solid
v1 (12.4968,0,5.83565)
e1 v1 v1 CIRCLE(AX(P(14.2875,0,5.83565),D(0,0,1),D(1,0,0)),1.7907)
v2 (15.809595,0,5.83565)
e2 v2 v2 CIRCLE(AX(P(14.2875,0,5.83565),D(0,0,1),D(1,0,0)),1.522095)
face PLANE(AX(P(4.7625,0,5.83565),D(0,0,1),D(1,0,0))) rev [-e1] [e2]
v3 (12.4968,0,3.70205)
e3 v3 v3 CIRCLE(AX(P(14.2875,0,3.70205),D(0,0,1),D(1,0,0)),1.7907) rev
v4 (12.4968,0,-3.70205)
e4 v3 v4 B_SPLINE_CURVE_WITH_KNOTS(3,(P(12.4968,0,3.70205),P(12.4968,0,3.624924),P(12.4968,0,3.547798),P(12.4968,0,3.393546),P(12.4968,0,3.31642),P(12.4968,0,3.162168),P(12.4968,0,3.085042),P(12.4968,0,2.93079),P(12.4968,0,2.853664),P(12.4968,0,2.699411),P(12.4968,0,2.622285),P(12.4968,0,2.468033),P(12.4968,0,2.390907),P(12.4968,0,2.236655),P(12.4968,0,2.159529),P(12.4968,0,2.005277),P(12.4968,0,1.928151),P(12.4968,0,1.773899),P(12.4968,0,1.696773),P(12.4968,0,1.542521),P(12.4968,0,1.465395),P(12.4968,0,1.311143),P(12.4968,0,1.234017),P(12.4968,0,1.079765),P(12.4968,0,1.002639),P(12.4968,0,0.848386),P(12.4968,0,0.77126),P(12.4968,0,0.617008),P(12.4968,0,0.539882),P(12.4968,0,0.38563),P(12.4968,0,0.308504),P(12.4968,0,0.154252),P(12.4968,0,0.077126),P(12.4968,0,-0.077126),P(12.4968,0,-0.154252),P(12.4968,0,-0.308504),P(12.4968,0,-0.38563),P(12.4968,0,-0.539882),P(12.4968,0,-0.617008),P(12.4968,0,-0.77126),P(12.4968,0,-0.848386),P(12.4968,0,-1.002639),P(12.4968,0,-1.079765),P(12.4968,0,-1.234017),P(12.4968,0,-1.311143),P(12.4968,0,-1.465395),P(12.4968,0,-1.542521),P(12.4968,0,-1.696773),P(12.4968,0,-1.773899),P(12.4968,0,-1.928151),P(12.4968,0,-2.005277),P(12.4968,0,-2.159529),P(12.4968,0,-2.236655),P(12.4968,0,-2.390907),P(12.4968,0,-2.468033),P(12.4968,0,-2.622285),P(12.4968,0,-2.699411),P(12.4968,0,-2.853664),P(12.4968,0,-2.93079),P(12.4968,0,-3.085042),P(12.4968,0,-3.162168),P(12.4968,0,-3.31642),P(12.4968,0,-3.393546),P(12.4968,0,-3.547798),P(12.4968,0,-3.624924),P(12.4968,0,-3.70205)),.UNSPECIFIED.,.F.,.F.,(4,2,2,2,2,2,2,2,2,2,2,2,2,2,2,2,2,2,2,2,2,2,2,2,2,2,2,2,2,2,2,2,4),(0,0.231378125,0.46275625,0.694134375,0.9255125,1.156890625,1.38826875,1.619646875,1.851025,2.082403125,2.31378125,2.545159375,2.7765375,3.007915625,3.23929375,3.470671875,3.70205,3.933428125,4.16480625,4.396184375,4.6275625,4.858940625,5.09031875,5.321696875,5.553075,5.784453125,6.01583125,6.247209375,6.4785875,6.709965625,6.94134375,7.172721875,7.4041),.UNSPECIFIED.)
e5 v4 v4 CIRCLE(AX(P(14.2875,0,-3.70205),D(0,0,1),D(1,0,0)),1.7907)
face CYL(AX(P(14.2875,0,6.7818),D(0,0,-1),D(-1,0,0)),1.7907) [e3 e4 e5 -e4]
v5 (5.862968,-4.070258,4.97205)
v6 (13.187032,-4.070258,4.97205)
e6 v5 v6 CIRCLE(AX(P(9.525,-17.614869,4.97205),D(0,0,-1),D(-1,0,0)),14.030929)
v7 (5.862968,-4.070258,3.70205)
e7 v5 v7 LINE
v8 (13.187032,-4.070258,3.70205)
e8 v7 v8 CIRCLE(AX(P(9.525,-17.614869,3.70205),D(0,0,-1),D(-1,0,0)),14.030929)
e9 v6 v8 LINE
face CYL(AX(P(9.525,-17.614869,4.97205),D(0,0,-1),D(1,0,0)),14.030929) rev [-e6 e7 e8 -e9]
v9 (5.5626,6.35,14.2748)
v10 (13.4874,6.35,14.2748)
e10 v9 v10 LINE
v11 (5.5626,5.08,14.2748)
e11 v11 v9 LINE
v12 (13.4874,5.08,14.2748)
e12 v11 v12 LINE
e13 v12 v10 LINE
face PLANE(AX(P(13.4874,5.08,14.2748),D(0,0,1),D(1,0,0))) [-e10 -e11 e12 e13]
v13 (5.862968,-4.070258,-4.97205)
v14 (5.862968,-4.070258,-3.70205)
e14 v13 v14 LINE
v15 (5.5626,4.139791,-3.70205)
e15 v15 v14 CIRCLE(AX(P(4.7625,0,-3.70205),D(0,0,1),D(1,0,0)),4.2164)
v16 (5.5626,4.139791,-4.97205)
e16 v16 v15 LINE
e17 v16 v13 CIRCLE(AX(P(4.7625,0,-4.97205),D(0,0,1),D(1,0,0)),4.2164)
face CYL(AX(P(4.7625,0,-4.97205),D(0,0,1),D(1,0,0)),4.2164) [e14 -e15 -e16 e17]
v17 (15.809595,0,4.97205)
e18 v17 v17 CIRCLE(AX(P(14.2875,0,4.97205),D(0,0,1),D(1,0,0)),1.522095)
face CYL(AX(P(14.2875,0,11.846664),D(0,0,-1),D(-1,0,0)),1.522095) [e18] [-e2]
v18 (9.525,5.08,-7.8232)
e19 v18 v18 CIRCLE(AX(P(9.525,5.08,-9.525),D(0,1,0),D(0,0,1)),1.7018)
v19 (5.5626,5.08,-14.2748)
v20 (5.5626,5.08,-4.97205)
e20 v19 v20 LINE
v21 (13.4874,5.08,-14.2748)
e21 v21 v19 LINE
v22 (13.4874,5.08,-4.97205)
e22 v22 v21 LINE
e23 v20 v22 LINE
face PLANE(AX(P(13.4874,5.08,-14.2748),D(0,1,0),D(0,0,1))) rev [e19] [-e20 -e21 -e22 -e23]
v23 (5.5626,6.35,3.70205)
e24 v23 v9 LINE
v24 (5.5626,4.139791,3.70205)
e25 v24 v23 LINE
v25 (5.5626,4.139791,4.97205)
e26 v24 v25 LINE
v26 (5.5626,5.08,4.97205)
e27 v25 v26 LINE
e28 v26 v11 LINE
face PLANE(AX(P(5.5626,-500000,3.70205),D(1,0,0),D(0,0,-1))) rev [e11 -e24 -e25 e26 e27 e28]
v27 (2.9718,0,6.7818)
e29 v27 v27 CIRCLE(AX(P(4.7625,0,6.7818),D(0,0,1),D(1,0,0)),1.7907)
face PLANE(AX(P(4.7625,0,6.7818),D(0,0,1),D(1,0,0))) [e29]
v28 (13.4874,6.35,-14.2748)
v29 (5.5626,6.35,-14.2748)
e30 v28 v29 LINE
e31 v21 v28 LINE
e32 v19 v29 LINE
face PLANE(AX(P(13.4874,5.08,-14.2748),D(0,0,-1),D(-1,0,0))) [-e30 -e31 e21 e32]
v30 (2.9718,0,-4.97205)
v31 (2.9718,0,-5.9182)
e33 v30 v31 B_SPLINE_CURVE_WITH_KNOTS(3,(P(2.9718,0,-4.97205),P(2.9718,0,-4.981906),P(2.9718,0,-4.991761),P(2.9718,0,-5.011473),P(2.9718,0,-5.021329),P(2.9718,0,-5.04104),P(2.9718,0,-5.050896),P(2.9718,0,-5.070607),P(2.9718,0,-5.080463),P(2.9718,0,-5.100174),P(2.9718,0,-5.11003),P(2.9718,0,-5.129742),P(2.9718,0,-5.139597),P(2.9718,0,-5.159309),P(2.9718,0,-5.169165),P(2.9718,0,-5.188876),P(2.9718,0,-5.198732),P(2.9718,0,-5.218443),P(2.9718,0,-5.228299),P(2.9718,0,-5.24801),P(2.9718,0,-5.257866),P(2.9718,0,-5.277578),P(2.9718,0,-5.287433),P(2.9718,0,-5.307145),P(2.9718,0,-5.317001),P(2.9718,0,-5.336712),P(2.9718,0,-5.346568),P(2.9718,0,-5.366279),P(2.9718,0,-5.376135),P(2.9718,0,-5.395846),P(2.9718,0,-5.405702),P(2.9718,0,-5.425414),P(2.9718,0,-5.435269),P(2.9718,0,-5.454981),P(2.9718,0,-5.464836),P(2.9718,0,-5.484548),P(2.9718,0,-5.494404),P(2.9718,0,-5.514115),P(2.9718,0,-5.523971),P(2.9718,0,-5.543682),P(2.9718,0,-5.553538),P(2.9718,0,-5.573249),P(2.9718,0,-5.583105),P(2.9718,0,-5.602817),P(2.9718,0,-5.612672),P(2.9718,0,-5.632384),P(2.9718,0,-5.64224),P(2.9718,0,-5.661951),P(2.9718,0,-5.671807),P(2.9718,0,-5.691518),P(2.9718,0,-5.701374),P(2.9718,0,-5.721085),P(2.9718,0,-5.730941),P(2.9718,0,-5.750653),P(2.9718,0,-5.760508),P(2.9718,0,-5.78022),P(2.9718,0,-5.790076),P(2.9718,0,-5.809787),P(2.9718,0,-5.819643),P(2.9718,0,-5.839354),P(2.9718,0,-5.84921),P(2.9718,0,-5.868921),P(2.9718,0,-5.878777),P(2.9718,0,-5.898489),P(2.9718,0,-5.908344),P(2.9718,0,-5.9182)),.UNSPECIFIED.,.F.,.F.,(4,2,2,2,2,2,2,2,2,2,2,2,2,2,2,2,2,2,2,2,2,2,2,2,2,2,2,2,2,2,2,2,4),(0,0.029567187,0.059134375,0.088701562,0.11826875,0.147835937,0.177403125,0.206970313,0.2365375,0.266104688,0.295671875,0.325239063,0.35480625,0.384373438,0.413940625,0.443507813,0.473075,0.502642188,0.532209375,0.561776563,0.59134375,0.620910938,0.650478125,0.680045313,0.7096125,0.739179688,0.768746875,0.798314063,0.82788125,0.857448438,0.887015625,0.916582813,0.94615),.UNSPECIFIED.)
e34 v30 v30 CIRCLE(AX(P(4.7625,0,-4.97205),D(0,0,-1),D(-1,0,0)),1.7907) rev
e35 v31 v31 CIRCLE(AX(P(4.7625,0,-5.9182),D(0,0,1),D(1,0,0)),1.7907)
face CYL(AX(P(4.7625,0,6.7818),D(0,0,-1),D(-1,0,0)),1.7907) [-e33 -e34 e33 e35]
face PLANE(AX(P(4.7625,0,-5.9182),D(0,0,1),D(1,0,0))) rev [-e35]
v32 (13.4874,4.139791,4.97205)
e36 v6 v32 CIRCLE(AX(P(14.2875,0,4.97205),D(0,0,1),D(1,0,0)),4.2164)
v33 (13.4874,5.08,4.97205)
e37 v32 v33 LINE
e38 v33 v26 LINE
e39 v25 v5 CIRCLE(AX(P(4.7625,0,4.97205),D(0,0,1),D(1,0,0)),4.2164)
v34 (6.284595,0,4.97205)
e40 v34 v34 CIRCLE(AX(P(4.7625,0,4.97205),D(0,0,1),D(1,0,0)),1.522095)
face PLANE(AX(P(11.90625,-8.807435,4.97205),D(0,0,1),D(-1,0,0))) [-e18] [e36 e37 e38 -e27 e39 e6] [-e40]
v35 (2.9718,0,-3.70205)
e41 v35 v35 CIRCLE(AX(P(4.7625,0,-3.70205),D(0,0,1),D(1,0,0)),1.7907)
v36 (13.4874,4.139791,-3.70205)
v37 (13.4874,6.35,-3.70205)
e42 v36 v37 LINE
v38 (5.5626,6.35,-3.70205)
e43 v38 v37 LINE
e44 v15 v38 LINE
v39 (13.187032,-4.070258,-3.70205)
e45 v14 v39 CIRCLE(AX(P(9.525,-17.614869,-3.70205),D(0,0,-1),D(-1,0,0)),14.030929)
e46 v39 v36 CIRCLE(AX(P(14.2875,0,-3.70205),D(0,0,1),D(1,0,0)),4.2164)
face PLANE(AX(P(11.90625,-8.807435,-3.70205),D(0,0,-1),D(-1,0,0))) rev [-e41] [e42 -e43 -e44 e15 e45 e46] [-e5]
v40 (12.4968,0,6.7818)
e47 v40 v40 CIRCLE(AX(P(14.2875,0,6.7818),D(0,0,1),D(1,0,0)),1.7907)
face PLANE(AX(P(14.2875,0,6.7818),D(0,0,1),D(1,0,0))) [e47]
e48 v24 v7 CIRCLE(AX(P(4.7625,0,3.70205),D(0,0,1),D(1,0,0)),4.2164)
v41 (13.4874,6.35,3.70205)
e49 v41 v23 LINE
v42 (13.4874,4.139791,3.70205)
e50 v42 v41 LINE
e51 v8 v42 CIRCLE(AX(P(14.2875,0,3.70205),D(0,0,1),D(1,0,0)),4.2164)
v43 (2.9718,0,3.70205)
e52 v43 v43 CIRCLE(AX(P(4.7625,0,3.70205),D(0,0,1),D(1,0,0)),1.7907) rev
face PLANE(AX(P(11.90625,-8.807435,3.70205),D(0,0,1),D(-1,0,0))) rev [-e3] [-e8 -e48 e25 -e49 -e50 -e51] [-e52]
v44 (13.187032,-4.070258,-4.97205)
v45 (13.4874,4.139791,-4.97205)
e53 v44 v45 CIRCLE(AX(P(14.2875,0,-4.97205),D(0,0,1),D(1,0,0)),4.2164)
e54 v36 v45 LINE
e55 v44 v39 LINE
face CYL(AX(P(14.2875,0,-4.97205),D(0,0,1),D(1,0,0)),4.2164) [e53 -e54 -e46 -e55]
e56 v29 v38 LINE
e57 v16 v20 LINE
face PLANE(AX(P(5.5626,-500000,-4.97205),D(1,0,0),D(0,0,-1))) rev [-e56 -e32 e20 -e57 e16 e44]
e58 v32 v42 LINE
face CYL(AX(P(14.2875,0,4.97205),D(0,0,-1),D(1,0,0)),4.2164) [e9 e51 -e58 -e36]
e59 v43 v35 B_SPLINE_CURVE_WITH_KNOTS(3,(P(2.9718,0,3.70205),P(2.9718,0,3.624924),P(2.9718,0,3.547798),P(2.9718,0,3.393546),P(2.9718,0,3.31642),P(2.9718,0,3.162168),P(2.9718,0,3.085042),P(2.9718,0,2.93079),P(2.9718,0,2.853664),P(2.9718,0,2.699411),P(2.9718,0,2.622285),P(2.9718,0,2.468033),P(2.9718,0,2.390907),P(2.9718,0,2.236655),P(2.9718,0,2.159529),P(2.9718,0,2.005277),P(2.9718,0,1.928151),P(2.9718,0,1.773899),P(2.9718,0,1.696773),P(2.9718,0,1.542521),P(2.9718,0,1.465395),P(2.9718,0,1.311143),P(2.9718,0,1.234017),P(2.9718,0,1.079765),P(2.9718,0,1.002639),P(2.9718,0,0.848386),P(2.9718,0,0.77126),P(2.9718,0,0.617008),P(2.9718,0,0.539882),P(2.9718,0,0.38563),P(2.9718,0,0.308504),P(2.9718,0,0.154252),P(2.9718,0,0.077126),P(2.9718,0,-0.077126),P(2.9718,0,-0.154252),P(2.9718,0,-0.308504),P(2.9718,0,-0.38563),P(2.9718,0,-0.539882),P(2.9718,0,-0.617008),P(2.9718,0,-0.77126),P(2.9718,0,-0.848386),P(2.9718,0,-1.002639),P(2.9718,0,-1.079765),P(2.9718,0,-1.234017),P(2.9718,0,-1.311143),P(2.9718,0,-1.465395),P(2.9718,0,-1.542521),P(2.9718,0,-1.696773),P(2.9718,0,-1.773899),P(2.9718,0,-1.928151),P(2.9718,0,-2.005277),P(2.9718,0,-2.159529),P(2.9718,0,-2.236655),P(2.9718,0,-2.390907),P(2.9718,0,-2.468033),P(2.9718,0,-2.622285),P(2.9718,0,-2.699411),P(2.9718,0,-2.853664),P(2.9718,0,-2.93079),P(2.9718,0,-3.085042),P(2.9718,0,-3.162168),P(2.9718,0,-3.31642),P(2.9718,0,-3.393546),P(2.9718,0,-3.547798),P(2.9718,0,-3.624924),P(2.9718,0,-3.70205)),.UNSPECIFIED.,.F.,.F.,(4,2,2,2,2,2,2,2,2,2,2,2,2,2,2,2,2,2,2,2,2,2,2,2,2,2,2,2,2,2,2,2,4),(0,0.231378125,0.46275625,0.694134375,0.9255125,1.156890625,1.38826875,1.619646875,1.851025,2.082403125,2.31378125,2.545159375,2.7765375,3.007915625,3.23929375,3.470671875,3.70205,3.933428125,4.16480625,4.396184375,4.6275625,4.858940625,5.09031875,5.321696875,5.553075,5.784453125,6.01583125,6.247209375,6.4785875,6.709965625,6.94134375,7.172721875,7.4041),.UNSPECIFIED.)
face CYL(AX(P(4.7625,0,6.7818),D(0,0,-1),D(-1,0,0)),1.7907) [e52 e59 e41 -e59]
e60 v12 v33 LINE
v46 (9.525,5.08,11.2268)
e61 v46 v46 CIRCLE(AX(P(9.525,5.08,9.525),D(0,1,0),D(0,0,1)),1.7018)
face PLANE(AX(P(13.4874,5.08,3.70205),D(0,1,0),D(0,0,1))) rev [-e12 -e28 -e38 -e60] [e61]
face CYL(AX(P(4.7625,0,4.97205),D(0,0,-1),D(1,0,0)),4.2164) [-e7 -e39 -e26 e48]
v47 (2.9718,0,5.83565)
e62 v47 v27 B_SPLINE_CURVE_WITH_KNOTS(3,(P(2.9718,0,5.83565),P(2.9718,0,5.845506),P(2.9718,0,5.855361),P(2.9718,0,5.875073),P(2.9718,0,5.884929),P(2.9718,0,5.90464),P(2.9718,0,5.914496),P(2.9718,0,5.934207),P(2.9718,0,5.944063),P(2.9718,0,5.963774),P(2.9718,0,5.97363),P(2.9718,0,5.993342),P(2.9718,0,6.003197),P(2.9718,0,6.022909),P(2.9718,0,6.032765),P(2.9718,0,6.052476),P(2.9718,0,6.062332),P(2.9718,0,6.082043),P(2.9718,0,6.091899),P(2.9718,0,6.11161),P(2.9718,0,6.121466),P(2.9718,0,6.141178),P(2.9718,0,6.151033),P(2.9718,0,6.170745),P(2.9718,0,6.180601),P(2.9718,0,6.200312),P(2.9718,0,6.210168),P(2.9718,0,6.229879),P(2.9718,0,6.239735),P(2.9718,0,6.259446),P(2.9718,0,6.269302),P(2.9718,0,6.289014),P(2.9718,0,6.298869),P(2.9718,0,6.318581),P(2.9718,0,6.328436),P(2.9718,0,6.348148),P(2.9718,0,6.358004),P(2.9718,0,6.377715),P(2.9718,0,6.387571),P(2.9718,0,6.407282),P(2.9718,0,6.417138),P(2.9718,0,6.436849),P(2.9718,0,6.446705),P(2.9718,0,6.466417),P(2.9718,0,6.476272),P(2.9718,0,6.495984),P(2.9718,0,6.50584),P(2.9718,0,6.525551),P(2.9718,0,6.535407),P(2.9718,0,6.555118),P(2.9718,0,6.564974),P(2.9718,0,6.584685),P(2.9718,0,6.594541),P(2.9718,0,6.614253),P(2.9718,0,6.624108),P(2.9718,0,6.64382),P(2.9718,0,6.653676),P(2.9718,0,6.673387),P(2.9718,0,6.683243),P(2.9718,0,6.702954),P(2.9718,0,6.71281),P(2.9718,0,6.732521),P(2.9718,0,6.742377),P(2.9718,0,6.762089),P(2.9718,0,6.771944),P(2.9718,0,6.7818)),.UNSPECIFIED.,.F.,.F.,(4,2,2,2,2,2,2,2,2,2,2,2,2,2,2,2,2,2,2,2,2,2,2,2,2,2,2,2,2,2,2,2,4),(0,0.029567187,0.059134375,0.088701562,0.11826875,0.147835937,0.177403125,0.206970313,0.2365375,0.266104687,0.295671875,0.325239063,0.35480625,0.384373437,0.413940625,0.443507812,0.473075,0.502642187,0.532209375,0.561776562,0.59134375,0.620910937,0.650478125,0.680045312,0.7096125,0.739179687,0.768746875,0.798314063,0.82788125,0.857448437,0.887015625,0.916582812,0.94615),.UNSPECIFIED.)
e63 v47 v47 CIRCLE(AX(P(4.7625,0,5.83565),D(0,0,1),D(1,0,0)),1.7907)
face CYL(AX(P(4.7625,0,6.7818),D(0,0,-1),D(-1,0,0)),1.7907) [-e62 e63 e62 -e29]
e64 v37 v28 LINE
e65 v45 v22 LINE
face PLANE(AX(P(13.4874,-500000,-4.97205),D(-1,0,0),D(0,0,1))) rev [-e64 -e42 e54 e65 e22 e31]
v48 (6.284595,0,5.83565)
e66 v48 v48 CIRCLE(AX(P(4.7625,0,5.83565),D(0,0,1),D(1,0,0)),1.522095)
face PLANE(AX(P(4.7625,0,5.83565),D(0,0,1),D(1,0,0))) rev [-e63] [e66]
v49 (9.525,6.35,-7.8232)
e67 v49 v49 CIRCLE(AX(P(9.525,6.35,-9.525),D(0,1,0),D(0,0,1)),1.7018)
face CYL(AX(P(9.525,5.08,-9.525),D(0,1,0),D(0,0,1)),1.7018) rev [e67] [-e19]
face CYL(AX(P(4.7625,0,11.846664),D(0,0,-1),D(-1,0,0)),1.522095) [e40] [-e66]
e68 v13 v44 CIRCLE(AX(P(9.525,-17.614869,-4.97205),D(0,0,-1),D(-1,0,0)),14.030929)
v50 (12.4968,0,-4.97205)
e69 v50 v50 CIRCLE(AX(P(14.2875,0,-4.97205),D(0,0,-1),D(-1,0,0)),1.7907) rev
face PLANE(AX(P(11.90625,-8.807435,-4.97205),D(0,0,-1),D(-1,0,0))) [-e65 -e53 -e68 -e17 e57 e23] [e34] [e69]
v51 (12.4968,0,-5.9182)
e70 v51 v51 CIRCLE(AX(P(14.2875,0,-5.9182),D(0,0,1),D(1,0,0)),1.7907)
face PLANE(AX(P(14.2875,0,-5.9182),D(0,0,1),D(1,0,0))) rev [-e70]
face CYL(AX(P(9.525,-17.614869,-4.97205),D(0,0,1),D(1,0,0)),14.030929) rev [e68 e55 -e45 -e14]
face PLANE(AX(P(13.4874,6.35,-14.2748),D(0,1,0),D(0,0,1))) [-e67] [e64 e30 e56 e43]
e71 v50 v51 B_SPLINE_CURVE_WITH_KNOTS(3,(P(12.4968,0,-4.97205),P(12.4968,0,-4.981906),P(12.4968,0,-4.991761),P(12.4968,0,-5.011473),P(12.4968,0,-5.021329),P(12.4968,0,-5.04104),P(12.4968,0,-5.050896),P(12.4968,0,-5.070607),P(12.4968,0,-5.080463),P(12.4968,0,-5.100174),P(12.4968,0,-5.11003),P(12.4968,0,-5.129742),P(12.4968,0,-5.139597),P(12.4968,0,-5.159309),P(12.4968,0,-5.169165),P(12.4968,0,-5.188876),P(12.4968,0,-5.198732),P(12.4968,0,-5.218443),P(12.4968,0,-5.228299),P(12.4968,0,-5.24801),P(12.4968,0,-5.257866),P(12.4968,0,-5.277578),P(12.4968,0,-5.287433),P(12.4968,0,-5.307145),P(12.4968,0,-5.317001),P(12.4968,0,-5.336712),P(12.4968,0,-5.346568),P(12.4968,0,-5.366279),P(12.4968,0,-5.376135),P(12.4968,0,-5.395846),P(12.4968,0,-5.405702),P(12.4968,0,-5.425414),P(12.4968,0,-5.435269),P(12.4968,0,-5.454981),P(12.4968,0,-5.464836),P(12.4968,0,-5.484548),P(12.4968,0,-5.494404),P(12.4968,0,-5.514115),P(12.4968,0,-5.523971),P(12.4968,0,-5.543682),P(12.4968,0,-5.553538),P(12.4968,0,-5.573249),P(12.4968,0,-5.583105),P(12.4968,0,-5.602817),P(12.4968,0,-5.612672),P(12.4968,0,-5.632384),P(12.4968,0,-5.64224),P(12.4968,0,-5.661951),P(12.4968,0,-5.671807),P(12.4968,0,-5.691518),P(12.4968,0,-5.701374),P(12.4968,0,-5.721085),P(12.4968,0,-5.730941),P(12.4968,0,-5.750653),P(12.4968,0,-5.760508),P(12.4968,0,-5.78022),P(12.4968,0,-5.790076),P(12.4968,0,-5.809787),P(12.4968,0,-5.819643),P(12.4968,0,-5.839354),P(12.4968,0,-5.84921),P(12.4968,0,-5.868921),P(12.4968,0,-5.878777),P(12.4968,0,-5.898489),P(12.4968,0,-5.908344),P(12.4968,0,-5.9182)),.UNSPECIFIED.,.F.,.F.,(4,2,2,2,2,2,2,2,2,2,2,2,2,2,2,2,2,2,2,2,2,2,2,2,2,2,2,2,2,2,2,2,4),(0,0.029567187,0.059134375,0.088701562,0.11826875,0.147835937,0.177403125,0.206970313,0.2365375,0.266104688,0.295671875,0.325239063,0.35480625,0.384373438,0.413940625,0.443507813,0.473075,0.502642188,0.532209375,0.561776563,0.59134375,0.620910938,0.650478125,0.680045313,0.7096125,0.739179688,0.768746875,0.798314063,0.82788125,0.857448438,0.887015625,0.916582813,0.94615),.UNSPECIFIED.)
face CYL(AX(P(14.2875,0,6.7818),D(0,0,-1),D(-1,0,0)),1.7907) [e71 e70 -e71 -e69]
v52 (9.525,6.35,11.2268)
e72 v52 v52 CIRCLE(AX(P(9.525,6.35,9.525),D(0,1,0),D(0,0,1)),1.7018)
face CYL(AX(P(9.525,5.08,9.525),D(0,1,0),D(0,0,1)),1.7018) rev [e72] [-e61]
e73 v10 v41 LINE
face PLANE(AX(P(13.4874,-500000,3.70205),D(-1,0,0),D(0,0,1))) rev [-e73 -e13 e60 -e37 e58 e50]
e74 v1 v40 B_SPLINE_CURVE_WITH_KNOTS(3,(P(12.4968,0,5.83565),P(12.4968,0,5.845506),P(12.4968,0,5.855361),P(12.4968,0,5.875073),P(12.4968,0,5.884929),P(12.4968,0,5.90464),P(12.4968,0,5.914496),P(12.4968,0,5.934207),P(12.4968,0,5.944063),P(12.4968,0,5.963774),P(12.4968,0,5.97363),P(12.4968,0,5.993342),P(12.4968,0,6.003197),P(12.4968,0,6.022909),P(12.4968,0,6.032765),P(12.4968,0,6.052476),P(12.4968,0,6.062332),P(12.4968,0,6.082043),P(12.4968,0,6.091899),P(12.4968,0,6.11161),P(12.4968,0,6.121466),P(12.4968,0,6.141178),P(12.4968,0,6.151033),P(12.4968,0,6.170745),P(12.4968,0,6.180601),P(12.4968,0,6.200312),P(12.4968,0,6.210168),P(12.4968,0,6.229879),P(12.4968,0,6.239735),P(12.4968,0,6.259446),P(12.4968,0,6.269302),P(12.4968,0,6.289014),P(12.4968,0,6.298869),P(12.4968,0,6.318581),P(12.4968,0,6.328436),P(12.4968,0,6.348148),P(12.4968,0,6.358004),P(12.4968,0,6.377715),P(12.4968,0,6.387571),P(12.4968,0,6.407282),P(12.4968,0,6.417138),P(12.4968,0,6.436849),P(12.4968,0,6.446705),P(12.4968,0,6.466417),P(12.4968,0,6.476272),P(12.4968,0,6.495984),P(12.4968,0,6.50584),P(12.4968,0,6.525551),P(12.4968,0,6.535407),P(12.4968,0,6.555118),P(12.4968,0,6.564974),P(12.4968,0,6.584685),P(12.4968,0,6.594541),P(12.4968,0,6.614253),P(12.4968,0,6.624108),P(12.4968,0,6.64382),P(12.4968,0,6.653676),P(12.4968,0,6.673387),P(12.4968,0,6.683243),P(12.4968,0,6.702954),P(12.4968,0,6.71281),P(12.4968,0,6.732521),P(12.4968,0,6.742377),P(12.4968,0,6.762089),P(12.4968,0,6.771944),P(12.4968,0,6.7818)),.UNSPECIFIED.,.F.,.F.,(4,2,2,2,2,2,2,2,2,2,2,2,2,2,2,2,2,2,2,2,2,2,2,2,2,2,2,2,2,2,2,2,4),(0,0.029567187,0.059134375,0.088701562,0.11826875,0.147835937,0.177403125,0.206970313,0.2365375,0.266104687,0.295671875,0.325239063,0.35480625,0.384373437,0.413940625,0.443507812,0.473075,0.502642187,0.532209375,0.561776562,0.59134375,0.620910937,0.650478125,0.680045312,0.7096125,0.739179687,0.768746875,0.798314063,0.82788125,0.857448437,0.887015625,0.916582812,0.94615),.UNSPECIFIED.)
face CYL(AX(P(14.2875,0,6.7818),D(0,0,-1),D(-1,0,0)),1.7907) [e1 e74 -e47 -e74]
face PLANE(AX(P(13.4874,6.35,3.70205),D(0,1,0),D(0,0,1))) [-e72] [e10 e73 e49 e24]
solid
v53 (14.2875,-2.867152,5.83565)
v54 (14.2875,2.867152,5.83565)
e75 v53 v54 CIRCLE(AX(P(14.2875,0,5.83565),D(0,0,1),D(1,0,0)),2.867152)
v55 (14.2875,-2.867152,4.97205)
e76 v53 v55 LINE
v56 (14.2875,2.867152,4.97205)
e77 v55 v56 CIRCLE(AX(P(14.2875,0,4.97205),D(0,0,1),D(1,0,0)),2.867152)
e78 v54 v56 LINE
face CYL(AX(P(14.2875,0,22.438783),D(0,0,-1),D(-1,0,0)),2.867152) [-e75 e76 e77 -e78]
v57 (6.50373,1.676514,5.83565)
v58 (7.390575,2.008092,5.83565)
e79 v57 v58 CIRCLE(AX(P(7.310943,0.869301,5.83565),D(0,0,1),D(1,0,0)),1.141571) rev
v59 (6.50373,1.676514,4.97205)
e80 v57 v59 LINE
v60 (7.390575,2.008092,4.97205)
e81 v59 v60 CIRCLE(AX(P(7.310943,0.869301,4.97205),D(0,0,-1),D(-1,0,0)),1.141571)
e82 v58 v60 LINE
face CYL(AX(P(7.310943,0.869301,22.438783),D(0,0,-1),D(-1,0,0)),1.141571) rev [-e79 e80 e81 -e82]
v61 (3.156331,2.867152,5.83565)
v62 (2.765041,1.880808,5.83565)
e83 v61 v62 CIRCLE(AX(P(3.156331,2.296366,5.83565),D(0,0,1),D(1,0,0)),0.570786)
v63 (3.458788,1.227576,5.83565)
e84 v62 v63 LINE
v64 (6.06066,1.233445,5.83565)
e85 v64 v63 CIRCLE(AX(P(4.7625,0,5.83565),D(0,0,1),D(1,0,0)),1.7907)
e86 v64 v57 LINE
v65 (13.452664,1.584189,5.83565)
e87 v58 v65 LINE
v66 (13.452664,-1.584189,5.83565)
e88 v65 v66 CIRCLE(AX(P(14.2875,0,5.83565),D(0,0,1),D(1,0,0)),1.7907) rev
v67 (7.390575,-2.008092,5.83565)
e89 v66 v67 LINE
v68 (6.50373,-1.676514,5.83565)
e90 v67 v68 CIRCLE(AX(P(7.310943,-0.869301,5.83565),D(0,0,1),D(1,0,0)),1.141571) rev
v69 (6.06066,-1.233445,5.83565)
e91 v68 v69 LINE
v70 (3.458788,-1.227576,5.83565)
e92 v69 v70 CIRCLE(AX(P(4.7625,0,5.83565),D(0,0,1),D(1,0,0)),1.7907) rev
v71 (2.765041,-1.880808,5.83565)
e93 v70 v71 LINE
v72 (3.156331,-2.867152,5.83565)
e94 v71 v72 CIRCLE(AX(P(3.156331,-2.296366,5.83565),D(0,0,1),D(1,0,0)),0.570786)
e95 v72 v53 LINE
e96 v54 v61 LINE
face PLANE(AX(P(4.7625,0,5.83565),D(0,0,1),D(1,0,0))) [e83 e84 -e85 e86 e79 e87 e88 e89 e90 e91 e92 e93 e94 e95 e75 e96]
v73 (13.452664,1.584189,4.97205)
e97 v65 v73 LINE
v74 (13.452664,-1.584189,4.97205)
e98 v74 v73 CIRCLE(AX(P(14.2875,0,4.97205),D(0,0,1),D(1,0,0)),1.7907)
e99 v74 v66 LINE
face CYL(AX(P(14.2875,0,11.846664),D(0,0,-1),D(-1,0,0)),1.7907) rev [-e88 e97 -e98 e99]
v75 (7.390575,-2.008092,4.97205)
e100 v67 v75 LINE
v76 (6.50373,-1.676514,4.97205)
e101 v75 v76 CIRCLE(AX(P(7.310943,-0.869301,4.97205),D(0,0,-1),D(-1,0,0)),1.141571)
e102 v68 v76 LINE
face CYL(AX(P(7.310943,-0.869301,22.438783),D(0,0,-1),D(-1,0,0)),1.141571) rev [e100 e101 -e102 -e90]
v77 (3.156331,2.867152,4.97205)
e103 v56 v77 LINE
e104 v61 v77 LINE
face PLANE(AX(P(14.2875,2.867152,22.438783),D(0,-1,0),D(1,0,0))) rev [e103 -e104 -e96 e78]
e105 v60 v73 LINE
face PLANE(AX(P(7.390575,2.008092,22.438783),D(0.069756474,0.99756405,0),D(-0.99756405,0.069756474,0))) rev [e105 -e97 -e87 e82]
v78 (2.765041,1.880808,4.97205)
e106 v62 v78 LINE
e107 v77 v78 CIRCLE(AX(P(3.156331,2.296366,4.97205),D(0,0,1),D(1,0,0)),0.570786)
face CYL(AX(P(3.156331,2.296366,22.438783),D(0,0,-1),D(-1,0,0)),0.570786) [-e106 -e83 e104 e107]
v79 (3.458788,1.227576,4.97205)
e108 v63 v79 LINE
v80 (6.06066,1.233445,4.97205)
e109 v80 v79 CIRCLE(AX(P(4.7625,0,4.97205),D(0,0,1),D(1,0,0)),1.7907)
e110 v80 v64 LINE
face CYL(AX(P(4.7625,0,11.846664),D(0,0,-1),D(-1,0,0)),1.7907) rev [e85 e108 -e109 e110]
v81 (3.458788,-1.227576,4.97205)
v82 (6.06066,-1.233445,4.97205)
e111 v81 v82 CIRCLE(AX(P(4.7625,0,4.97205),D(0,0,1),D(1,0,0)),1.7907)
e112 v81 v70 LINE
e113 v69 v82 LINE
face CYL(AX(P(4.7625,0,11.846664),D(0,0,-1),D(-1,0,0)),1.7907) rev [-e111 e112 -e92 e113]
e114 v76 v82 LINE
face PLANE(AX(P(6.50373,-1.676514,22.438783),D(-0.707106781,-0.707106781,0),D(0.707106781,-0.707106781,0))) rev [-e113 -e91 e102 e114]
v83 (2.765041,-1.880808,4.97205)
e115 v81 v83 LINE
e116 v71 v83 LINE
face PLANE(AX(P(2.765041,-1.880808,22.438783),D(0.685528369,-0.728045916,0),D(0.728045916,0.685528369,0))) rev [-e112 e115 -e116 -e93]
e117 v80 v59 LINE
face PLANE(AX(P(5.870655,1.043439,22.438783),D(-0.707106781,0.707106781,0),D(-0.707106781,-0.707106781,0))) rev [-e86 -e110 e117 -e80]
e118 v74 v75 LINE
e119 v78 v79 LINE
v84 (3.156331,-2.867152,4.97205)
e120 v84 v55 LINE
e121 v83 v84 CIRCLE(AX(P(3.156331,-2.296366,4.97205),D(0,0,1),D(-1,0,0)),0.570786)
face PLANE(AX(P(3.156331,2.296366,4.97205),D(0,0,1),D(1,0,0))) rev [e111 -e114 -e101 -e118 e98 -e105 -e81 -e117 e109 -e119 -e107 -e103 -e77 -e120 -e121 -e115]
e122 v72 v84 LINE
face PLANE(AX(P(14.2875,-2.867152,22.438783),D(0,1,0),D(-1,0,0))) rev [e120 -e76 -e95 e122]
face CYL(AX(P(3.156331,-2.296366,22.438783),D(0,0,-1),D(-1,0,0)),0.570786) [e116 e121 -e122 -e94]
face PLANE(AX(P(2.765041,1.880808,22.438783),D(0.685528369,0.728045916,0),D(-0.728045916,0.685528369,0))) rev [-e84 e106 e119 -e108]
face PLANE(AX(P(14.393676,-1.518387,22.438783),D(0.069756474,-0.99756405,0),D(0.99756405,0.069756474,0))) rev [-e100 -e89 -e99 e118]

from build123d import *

# Parameters (mm, degrees)
SKETCH4_R                  = 2.54
SKETCH4_R_2                = 1.8161
BOSS_EXTRUDE1_DEPTH        = 2.38125
SKETCH5_R                  = 1.7907
BOSS_EXTRUDE2_DEPTH        = 1.27
LPATTERN1_COUNT            = 2
LPATTERN1_PITCH            = 9.525
SKETCH7_R                  = 1.7907
BOSS_EXTRUDE3_DEPTH        = 1.27
MIRROR1_START              = 3.70205
MIRROR1_OUTLINE_R          = 1.7907
MIRROR1_DEPTH              = 1.27
BOSS_EXTRUDE4_DEPTH        = 6.7818
BOSS_EXTRUDE4_DEPTH_BACK   = 5.9182
SKETCH8_R                  = 1.7907
BOSS_EXTRUDE4_2_DEPTH      = 6.7818
BOSS_EXTRUDE4_2_DEPTH_BACK = 5.9182
BOSS_EXTRUDE5_DEPTH        = 0.8636
SKETCH12_R                 = 1.7907
SKETCH12_R_2               = 1.522095
CUT_EXTRUDE1_DEPTH         = 0.8636
SKETCH13_W                 = 7.9248
SKETCH13_H                 = 10.57275
SKETCH13_R                 = 1.7018
BOSS_EXTRUDE6_DEPTH        = 1.27
BOSS_EXTRUDE6_2_DEPTH      = 1.27
BOSS_EXTRUDE7_REACH        = 27.151
SKETCH14_W                 = 7.9248
SKETCH14_H                 = 1.27
BOSS_EXTRUDE8_REACH        = 27.151
SKETCH15_W                 = 7.9248
SKETCH15_H                 = 1.27


# Read off the part's stored shape, not the designer's step: Mirror1
with BuildPart() as part:
    # Sketch4 → Boss-Extrude1 (new, symmetric)
    with BuildSketch(Plane.XY):
        with Locations(Location((4.7625, 0, 0), (0, 0, 180))):
            Circle(SKETCH4_R)
        with Locations(Location((4.7625, 0, 0), (0, 0, 180))):
            Circle(SKETCH4_R_2, mode=Mode.SUBTRACT)
    extrude(amount=BOSS_EXTRUDE1_DEPTH, both=True)


with BuildPart() as body_2:
    # Sketch5 → Boss-Extrude2 (new body)
    with BuildSketch(Plane.XY.offset(2.38125)):
        with BuildLine():
            ThreePointArc((-3.66203184, 4.070257828), (-8.9789, 0), (-3.66203184, -4.070257828))
            ThreePointArc((-3.66203184, -4.070257828), (0, -3.58394), (3.66203184, -4.070257828))
            ThreePointArc((3.66203184, -4.070257828), (8.9789, 0), (3.66203184, 4.070257828))
            ThreePointArc((3.66203184, 4.070257828), (0, 3.58394), (-3.66203184, 4.070257828))
        make_face()
        with Locations((-4.7625, 0)):
            Circle(SKETCH5_R, mode=Mode.SUBTRACT)
        with Locations((4.7625, 0)):
            Circle(SKETCH5_R, mode=Mode.SUBTRACT)
    extrude(amount=BOSS_EXTRUDE2_DEPTH)


with BuildPart() as lpattern1_1:
    # LPattern1: pattern copy
    add(part.part.moved(Location(Vector(1, 0, 0) * (1 * LPATTERN1_PITCH))))


with BuildPart() as body_4:
    # Sketch7 → Boss-Extrude3 (new body)
    with BuildSketch(Plane.XY.offset(-3.70205)):
        with BuildLine():
            ThreePointArc((5.86296816, 4.070257828), (0.5461, 0), (5.86296816, -4.070257828))
            ThreePointArc((5.86296816, -4.070257828), (9.525, -3.58394), (13.18703184, -4.070257828))
            ThreePointArc((13.18703184, -4.070257828), (18.5039, 0), (13.18703184, 4.070257828))
            ThreePointArc((13.18703184, 4.070257828), (9.525, 3.58394), (5.86296816, 4.070257828))
        make_face()
        with Locations((4.7625, 0)):
            Circle(SKETCH7_R, mode=Mode.SUBTRACT)
        with Locations((14.2875, 0)):
            Circle(SKETCH7_R, mode=Mode.SUBTRACT)
    extrude(amount=-BOSS_EXTRUDE3_DEPTH)


with BuildPart() as body_5:
    # Mirror1 outline → Mirror1 (new body)
    with BuildSketch(Plane.XY.offset(MIRROR1_START)):
        with BuildLine():
            ThreePointArc((5.86296816, 4.070257828), (0.5461, 0), (5.86296816, -4.070257828))
            ThreePointArc((5.86296816, -4.070257828), (9.525, -3.58394), (13.18703184, -4.070257828))
            ThreePointArc((13.18703184, -4.070257828), (18.5039, 0), (13.18703184, 4.070257828))
            ThreePointArc((13.18703184, 4.070257828), (9.525, 3.58394), (5.86296816, 4.070257828))
        make_face()
        with Locations((4.7625, 0)):
            Circle(MIRROR1_OUTLINE_R, mode=Mode.SUBTRACT)
        with Locations((14.2875, 0)):
            Circle(MIRROR1_OUTLINE_R, mode=Mode.SUBTRACT)
    extrude(amount=MIRROR1_DEPTH)


with BuildPart() as body_3:
    # Sketch8 → Boss-Extrude4 (new, two sides: drawn at the far end of the back side and taken through both)
    with BuildSketch(Plane.XY.offset(-BOSS_EXTRUDE4_DEPTH_BACK)):
        with Locations(Location((4.7625, 0, 0), (0, 0, 180))):
            Circle(SKETCH8_R)
    extrude(amount=BOSS_EXTRUDE4_DEPTH + BOSS_EXTRUDE4_DEPTH_BACK)


with BuildPart() as body_4_2:
    # Sketch8 → Boss-Extrude4 2 (new, two sides: drawn at the far end of the back side and taken through both)
    with BuildSketch(Plane.XY.offset(-BOSS_EXTRUDE4_2_DEPTH_BACK)):
        with Locations(Location((14.2875, 0, 0), (0, 0, 180))):
            Circle(SKETCH8_R)
    extrude(amount=BOSS_EXTRUDE4_2_DEPTH + BOSS_EXTRUDE4_2_DEPTH_BACK)


with BuildPart() as body_5_2:
    # Sketch10 → Boss-Extrude5 (new body)
    with BuildSketch(Plane.XY.offset(4.97205)):
        with BuildLine():
            Line((14.2875, -2.867152), (3.156330824, -2.867152))
            ThreePointArc((3.156330824, -2.867152), (2.625769403, -2.506843945), (2.765041086, -1.880808232))
            Line((2.765041086, -1.880808232), (3.654344952, -1.043439303))
            ThreePointArc((3.654344952, -1.043439303), (4.7625, -1.522095), (5.870655048, -1.043439303))
            Line((5.870655048, -1.043439303), (6.503729881, -1.676514136))
            ThreePointArc((6.503729881, -1.676514136), (6.911155975, -1.938579406), (7.390574638, -2.008091804))
            Line((7.390574638, -2.008091804), (14.39367598, -1.518387253))
            ThreePointArc((14.39367598, -1.518387253), (15.809595, 0), (14.39367598, 1.518387253))
            Line((14.39367598, 1.518387253), (7.390574638, 2.008091804))
            ThreePointArc((7.390574638, 2.008091804), (6.911155975, 1.938579406), (6.503729881, 1.676514136))
            Line((6.503729881, 1.676514136), (5.870655048, 1.043439303))
            ThreePointArc((5.870655048, 1.043439303), (4.7625, 1.522095), (3.654344952, 1.043439303))
            Line((3.654344952, 1.043439303), (2.765041086, 1.880808232))
            ThreePointArc((2.765041086, 1.880808232), (2.625769403, 2.506843945), (3.156330824, 2.867152))
            Line((3.156330824, 2.867152), (14.2875, 2.867152))
            ThreePointArc((14.2875, 2.867152), (17.154652, 0), (14.2875, -2.867152))
        make_face()
    extrude(amount=BOSS_EXTRUDE5_DEPTH)


with BuildPart() as cut_extrude1_tool:
    # Sketch12 → Cut-Extrude1 (new body)
    # profile 1 of 2: a face of its own
    with BuildSketch(Plane.XY.offset(4.97205)):
        with Locations(Location((4.7625, 0, 0), (0, 0, 180))):
            Circle(SKETCH12_R)
        with Locations((4.7625, 0)):
            Circle(SKETCH12_R_2, mode=Mode.SUBTRACT)
    # profile 2 of 2: a face of its own
    with BuildSketch(Plane.XY.offset(4.97205)):
        with Locations(Location((14.2875, 0, 0), (0, 0, 180))):
            Circle(SKETCH12_R)
        with Locations((14.2875, 0)):
            Circle(SKETCH12_R_2, mode=Mode.SUBTRACT)
    extrude(amount=CUT_EXTRUDE1_DEPTH)


with BuildPart() as body_3_1:
    add(body_3.part)

    # Cut-Extrude1: cut by cut_extrude1_tool
    add(cut_extrude1_tool.part, mode=Mode.SUBTRACT)


with BuildPart() as body_4_2_1:
    add(body_4_2.part)

    # Cut-Extrude1: cut by cut_extrude1_tool
    add(cut_extrude1_tool.part, mode=Mode.SUBTRACT)


with BuildPart() as body_5_2_1:
    add(body_5_2.part)

    # Cut-Extrude1: cut by cut_extrude1_tool
    add(cut_extrude1_tool.part, mode=Mode.SUBTRACT)


with BuildPart() as body_4_1:
    add(body_4.part)

    # Combine3: union body 5, body 4 2, body 3
    add(body_5.part)
    add(body_4_2_1.part)
    add(body_3_1.part)

    # Sketch14 → Boss-Extrude7 (add, up to next)
    with BuildSketch(Plane.XZ.offset(-5.08), mode=Mode.PRIVATE) as boss_extrude7_sk1:
        with Locations((9.525, -4.33705)):
            Rectangle(SKETCH14_W, SKETCH14_H)
    boss_extrude7_tool1 = extrude(boss_extrude7_sk1.sketch, amount=BOSS_EXTRUDE7_REACH, mode=Mode.PRIVATE) - body_4_1.part


with BuildPart() as body_3_2:
    # Sketch13 → Boss-Extrude6 (new body)
    with BuildSketch(Plane(origin=(0, 6.35, 0), x_dir=(-1, 0, 0), z_dir=(0, 1, 0))):
        with Locations((-9.525, -8.988425)):
            Rectangle(SKETCH13_W, SKETCH13_H)
        with Locations(Location((-9.525, -9.525, 0), (0, 0, 90))):
            Circle(SKETCH13_R, mode=Mode.SUBTRACT)
    extrude(amount=-BOSS_EXTRUDE6_DEPTH)


with BuildPart() as body_4_3:
    # Sketch13 → Boss-Extrude6 2 (new body)
    with BuildSketch(Plane(origin=(0, 6.35, 0), x_dir=(-1, 0, 0), z_dir=(0, 1, 0))):
        with Locations((-9.525, 8.988425)):
            Rectangle(SKETCH13_W, SKETCH13_H)
        with Locations(Location((-9.525, 9.525, 0), (0, 0, 90))):
            Circle(SKETCH13_R, mode=Mode.SUBTRACT)
    extrude(amount=-BOSS_EXTRUDE6_2_DEPTH)


with BuildPart() as body_4_4:
    add(body_4_1.part)

    add(body_3_2.part)  # Boss-Extrude7 merges body 3 2
    add(boss_extrude7_tool1.solids().sort_by_distance((9.525, 5.08, -4.33705))[0])

    # Sketch15 → Boss-Extrude8 (add, up to next)
    with BuildSketch(Plane.XZ.offset(-5.08), mode=Mode.PRIVATE) as boss_extrude8_sk1:
        with Locations((9.525, 4.33705)):
            Rectangle(SKETCH15_W, SKETCH15_H)
    boss_extrude8_tool1 = extrude(boss_extrude8_sk1.sketch, amount=BOSS_EXTRUDE8_REACH, mode=Mode.PRIVATE) - body_4_4.part

    add(body_4_3.part)  # Boss-Extrude8 merges body 4 3
    add(boss_extrude8_tool1.solids().sort_by_distance((9.525, 5.08, 4.33705))[0])


solid = Compound([body_5_2_1.part, body_4_4.part])
